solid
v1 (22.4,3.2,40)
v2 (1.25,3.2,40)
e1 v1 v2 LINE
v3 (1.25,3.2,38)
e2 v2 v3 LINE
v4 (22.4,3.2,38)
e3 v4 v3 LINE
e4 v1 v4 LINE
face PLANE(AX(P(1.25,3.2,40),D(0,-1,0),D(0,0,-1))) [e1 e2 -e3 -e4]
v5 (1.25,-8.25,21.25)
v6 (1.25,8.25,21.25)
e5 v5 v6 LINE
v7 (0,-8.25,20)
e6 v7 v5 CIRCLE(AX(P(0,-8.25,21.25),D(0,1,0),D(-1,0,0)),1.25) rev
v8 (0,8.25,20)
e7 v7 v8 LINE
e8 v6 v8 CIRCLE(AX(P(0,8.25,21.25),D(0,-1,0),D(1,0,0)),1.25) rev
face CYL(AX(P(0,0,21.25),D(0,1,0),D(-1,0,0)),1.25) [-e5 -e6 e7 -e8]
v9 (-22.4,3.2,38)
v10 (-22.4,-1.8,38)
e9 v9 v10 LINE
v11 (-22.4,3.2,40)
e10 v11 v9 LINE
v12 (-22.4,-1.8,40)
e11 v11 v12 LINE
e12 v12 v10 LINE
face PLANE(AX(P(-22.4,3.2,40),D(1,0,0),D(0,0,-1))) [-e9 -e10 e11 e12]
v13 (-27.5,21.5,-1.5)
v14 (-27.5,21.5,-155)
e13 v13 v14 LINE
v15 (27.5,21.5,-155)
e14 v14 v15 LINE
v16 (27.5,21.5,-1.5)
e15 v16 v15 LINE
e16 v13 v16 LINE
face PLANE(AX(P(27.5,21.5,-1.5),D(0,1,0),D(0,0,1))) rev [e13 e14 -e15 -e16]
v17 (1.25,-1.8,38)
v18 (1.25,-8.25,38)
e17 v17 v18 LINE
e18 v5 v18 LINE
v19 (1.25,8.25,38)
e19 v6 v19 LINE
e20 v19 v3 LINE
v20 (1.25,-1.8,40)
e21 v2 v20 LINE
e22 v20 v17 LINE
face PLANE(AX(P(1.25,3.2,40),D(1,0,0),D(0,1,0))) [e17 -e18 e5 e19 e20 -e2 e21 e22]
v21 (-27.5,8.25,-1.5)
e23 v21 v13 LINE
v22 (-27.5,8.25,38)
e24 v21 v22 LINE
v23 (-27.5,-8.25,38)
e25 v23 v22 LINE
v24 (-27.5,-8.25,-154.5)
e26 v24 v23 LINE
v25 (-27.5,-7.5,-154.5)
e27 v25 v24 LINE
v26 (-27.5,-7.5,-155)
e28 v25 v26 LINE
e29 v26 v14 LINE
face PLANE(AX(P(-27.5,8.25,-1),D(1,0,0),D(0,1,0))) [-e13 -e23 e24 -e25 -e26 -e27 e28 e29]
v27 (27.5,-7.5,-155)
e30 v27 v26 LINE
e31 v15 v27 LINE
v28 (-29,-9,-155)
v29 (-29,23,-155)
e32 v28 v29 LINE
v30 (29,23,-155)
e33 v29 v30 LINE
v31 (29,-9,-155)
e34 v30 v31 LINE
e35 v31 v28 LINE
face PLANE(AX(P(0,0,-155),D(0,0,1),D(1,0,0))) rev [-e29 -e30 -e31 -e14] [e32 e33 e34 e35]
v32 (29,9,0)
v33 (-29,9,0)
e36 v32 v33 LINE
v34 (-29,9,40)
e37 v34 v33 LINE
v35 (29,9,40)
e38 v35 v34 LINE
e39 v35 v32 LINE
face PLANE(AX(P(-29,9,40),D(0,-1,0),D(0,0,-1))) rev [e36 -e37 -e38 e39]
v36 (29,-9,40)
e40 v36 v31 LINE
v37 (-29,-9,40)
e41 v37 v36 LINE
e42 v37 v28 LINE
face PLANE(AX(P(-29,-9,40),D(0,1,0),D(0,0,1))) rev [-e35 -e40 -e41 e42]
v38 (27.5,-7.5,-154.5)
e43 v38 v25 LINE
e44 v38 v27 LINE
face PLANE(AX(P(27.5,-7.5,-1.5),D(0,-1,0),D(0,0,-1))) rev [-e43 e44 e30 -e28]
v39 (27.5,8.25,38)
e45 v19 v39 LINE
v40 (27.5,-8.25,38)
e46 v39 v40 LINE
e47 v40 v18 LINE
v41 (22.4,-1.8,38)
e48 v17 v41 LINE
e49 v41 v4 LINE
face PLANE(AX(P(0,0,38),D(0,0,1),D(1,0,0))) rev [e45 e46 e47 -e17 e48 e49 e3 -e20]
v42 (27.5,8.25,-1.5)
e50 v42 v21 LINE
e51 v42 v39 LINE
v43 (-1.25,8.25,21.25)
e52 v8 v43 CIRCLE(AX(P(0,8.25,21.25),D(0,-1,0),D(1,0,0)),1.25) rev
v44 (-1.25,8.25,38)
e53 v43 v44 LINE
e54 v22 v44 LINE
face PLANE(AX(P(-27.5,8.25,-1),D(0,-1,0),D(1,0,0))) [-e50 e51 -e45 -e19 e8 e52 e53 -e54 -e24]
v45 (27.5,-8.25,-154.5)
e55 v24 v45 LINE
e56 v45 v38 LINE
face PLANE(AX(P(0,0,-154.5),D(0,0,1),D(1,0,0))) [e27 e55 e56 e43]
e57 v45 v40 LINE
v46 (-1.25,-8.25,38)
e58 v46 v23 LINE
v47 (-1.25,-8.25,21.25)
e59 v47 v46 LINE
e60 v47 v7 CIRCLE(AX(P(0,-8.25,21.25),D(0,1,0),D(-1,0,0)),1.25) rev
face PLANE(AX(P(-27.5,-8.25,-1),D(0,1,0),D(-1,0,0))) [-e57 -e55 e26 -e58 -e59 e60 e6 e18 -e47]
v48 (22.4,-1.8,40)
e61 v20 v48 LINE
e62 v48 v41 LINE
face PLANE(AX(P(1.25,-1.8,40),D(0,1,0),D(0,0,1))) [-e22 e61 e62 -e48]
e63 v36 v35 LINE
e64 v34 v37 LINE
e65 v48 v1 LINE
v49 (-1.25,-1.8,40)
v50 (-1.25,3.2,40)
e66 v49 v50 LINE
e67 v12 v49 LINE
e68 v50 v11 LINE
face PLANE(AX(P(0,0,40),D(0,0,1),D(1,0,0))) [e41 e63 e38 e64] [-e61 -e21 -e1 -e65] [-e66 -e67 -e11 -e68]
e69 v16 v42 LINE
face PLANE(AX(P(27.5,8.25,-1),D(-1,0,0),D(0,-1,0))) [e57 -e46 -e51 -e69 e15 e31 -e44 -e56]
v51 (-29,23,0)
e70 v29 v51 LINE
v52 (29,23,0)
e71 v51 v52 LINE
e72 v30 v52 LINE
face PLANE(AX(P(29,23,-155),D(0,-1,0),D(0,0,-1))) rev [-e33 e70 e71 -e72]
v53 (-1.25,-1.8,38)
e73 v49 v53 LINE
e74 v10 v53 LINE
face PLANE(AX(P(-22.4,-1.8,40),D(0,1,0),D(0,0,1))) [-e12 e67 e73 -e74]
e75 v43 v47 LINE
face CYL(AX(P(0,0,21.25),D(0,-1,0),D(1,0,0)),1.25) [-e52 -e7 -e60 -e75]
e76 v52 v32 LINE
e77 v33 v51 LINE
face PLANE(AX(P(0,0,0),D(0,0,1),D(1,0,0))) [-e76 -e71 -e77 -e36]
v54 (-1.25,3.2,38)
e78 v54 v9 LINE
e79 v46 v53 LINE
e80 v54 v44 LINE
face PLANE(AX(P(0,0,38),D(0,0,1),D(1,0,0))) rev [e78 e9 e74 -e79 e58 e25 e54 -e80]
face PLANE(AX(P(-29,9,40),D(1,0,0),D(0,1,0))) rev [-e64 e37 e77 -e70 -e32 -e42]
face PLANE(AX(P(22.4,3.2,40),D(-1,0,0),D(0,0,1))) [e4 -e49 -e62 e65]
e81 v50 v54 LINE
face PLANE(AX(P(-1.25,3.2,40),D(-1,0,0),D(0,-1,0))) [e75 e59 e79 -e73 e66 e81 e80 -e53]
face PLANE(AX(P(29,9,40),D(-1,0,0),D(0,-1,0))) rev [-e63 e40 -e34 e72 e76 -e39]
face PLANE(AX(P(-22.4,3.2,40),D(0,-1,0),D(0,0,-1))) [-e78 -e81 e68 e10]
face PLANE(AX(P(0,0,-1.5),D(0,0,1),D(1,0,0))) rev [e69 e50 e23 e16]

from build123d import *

# Parameters (mm, degrees)
SKETCH1_W           = 58
SKETCH1_H           = 18
SKETCH1_W_2         = 21.15
SKETCH1_H_2         = 5
BOSS_EXTRUDE1_DEPTH = 40
SKETCH2_W           = 58
SKETCH2_H           = 32
BOSS_EXTRUDE2_DEPTH = 155
CUT_EXTRUDE1_START  = 2
SKETCH3_W           = 55
SKETCH3_H           = 16.5
CUT_EXTRUDE1_DEPTH  = 39
SKETCH4_W           = 2.5
SKETCH4_H           = 16.5
BOSS_EXTRUDE3_DEPTH = 20
FILLET1_R           = 1.25
SKETCH5_W           = 55
SKETCH5_H           = 29
CUT_EXTRUDE2_DEPTH  = 153.5
SKETCH6_W           = 55
SKETCH6_H           = 16.5
CUT_EXTRUDE3_DEPTH  = 153.5


with BuildPart() as part:
    # Sketch1 → Boss-Extrude1 (new body)
    with BuildSketch(Plane.XY):
        Rectangle(SKETCH1_W, SKETCH1_H)
        with Locations((-11.825, 0.7)):
            Rectangle(SKETCH1_W_2, SKETCH1_H_2, mode=Mode.SUBTRACT)
        with Locations((11.825, 0.7)):
            Rectangle(SKETCH1_W_2, SKETCH1_H_2, mode=Mode.SUBTRACT)
    extrude(amount=BOSS_EXTRUDE1_DEPTH)

    # Sketch2 → Boss-Extrude2 (add)
    with BuildSketch(Plane(origin=(0, 0, 0), x_dir=(-1, 0, 0), z_dir=(0, 0, -1))):
        with Locations((0, 7)):
            Rectangle(SKETCH2_W, SKETCH2_H)
    extrude(amount=BOSS_EXTRUDE2_DEPTH)

    # Sketch3 → Cut-Extrude1 (cut)
    with BuildSketch(Plane(origin=(0, 0, 40), x_dir=(-1, 0, 0), z_dir=(0, 0, -1)).offset(CUT_EXTRUDE1_START)):
        Rectangle(SKETCH3_W, SKETCH3_H)
    extrude(amount=CUT_EXTRUDE1_DEPTH, mode=Mode.SUBTRACT)

    # Sketch4 → Boss-Extrude3 (add)
    with BuildSketch(Plane(origin=(0, 0, 40), x_dir=(-1, 0, 0), z_dir=(0, 0, -1))):
        Rectangle(SKETCH4_W, SKETCH4_H)
    extrude(amount=BOSS_EXTRUDE3_DEPTH)

    # Fillet1
    fillet1_edges = [part.edges().sort_by_distance(p)[0] for p in [
        (1.25, 0, 20),
        (-1.25, 0, 20),
    ]]
    fillet(fillet1_edges, radius=FILLET1_R - 0.0001)  # a hair under: the kernel refuses the full size

    # Sketch5 → Cut-Extrude2 (cut)
    with BuildSketch(Plane(origin=(0, 0, -155), x_dir=(-1, 0, 0), z_dir=(0, 0, -1))):
        with Locations((0, 7)):
            Rectangle(SKETCH5_W, SKETCH5_H)
    extrude(amount=-CUT_EXTRUDE2_DEPTH, mode=Mode.SUBTRACT)

    # Sketch6 → Cut-Extrude3 (cut)
    with BuildSketch(Plane.XY.offset(-1)):
        Rectangle(SKETCH6_W, SKETCH6_H)
    extrude(amount=-CUT_EXTRUDE3_DEPTH, mode=Mode.SUBTRACT)


solid = part.part
